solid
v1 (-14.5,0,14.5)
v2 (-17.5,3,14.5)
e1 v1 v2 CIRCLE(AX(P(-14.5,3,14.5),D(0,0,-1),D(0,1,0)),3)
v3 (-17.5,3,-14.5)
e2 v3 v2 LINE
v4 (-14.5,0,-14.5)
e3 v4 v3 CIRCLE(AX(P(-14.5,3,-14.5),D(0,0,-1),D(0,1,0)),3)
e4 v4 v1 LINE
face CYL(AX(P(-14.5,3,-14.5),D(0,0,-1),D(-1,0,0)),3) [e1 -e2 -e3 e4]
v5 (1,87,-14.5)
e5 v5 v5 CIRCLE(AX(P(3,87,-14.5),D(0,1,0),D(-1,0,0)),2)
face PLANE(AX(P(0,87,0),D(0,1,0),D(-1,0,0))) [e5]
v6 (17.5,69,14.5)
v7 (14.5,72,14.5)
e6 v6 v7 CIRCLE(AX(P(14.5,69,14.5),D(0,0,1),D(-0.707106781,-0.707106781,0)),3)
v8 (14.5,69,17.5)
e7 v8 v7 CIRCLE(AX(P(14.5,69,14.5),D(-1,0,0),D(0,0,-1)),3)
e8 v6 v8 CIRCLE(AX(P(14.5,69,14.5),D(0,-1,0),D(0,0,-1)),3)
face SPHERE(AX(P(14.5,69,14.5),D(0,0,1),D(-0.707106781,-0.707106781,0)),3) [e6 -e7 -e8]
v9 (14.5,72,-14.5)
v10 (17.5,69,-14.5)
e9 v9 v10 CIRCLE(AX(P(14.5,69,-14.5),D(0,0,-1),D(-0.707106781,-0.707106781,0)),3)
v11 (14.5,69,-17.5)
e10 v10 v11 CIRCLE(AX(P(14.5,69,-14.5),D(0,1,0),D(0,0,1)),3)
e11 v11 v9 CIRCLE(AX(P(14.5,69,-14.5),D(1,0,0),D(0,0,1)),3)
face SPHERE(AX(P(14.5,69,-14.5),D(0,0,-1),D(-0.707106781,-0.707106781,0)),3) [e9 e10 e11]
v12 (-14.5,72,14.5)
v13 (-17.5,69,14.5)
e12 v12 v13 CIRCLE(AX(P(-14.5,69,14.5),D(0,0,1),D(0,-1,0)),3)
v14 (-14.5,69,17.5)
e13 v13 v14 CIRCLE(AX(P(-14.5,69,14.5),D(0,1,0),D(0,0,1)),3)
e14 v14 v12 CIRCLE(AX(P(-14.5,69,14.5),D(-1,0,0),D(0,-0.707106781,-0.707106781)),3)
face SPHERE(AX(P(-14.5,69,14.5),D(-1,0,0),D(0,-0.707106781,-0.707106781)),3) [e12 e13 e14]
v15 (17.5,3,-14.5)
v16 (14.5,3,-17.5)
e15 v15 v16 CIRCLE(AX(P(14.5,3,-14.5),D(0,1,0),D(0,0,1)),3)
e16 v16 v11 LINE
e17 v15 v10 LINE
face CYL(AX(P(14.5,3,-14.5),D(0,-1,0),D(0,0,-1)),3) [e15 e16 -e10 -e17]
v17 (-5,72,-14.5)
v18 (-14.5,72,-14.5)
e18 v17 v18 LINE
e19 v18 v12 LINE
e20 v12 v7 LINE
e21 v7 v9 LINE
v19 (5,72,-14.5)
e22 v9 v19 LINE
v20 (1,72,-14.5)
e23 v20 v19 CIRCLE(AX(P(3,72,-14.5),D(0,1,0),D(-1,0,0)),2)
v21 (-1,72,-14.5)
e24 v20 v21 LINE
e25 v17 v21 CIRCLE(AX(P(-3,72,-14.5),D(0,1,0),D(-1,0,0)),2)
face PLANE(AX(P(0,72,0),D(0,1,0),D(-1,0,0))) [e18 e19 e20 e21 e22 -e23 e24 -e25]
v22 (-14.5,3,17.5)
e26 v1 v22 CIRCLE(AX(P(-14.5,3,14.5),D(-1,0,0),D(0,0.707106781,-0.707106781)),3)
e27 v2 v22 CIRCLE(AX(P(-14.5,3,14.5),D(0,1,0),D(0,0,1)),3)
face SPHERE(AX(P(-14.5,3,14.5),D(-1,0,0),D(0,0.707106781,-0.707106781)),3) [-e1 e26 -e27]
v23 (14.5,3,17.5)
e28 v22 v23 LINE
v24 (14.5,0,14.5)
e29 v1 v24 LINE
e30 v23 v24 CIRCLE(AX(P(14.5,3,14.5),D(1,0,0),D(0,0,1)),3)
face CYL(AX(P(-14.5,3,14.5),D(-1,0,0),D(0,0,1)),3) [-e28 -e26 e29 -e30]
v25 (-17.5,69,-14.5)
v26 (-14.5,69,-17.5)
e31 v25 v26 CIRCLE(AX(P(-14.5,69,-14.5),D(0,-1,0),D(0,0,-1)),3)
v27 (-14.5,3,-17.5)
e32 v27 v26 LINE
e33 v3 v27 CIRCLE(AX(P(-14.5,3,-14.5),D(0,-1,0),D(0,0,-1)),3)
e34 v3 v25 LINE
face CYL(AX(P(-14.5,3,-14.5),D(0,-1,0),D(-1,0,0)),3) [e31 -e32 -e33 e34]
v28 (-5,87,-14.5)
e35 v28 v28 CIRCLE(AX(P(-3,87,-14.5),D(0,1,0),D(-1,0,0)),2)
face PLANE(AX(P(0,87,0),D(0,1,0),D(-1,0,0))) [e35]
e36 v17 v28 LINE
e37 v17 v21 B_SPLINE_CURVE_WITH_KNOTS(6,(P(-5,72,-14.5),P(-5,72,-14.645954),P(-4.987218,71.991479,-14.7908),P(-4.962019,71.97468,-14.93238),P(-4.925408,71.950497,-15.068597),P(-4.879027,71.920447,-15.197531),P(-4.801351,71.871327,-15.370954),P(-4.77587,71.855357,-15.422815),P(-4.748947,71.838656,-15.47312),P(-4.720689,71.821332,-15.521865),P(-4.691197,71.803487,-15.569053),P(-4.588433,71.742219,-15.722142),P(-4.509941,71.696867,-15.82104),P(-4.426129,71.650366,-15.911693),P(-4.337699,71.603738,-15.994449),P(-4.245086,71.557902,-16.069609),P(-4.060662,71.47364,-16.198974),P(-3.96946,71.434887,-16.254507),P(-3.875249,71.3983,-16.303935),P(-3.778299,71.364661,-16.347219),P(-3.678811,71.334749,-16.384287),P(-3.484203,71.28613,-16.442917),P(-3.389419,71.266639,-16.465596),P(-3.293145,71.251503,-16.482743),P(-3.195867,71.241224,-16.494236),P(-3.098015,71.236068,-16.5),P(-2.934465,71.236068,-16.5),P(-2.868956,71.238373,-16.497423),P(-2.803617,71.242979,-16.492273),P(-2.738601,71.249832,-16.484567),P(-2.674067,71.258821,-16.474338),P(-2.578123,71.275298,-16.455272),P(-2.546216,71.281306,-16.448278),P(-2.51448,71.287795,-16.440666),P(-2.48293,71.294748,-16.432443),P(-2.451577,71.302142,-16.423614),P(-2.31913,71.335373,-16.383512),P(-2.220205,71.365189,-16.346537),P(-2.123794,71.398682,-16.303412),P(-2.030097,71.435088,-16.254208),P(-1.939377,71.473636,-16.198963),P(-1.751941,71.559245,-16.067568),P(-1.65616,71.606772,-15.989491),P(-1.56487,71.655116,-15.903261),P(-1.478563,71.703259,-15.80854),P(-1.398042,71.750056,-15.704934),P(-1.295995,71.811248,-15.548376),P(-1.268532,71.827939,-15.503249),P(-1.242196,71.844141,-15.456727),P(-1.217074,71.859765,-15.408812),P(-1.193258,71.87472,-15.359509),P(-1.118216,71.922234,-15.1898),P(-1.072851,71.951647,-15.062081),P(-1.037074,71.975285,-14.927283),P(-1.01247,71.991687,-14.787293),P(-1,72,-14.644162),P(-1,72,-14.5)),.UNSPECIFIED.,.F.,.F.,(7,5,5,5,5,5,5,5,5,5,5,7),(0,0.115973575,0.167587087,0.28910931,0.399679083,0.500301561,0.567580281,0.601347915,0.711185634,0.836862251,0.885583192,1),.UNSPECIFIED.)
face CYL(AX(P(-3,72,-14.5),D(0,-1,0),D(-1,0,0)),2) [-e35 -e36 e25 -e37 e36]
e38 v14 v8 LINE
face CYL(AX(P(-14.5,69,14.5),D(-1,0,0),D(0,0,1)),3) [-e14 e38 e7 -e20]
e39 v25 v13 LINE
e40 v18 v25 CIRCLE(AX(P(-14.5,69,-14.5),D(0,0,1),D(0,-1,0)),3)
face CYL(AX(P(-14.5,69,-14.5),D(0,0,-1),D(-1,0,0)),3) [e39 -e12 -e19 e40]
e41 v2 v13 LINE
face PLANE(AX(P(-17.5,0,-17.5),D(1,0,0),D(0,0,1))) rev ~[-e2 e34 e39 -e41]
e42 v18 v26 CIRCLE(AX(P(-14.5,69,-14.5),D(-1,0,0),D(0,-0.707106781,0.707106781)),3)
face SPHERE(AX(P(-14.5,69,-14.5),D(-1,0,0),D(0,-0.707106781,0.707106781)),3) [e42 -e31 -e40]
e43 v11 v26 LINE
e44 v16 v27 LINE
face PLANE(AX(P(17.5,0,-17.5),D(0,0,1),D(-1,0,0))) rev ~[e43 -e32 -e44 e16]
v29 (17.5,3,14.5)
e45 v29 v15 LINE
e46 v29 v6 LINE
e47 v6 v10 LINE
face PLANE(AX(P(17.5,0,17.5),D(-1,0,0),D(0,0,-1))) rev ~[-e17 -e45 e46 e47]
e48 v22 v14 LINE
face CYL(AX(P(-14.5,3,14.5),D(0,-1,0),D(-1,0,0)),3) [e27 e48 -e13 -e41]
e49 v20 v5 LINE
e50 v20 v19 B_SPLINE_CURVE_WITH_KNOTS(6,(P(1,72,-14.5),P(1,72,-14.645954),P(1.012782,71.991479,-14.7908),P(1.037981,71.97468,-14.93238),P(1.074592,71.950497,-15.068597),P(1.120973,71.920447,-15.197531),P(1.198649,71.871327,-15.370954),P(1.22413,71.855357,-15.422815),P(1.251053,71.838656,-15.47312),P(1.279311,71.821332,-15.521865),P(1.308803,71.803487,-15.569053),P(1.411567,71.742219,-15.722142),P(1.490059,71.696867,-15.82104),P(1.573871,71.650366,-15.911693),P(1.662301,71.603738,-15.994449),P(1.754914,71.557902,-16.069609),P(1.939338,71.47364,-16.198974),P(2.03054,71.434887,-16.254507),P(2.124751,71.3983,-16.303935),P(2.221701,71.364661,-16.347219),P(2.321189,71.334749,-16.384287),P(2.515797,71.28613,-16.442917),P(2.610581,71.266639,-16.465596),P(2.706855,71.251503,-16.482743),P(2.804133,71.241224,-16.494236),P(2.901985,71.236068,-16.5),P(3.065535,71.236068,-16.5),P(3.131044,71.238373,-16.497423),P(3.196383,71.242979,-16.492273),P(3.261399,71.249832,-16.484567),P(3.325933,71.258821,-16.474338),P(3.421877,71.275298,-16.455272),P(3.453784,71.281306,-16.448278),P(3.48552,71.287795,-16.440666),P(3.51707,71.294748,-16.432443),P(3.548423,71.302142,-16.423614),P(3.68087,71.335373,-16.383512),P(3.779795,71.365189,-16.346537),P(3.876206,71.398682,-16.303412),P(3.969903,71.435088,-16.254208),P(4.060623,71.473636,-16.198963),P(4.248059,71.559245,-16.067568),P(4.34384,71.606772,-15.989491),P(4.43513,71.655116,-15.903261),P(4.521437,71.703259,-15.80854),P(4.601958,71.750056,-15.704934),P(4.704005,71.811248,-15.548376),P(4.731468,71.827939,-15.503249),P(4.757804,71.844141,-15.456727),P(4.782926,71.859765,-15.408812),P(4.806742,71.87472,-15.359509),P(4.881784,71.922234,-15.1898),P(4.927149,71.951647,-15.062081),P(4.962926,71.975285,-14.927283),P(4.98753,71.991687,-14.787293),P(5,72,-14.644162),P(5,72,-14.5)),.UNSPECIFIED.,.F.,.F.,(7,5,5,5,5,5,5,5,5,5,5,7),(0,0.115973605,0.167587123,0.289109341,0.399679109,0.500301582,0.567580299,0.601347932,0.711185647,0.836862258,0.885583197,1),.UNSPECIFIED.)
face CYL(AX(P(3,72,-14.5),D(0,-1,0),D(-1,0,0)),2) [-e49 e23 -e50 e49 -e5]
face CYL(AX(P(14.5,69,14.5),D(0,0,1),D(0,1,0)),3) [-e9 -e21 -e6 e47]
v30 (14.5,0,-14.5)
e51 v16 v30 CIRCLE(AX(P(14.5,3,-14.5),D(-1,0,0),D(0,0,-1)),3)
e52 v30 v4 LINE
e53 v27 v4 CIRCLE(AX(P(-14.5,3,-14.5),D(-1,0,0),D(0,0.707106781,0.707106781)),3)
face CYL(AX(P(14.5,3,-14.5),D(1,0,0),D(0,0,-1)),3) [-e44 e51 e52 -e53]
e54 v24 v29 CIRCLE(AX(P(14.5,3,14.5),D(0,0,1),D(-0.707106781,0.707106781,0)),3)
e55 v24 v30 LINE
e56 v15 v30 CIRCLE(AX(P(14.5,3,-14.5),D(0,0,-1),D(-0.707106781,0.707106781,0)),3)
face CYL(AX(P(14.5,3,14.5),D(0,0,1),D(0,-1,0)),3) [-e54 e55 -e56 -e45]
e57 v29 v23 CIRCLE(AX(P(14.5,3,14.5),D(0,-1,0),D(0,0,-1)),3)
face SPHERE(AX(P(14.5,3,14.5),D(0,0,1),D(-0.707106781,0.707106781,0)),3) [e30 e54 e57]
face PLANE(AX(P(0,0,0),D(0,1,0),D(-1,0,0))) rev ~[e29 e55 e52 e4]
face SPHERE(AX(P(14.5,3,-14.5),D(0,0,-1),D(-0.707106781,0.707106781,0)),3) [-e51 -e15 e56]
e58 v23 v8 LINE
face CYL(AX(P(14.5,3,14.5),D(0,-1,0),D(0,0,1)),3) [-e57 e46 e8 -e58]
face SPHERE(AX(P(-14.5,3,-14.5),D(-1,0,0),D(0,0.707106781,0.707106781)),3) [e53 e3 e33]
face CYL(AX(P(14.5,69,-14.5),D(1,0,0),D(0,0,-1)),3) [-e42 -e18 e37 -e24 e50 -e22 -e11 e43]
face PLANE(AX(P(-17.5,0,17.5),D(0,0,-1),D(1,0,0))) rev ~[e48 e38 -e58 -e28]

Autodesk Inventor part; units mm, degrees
ref_plane "YZ Plane" through (0, 0, 0) normal (1, 0, 0) x (0, 1, 0)
ref_plane "XZ Plane" through (0, 0, 0) normal (0, 1, 0) x (-1, 0, 0)
ref_plane "XY Plane" through (0, 0, 0) normal (0, 0, 1) x (1, 0, 0)
sketch "Sketch1" plane through (0, 0, 0) normal (0, 1, 0) x (-1, 0, 0)
  line L0 (17.5, 17.5) -> (-17.5, 17.5)
  line L1 (-17.5, 17.5) -> (-17.5, -17.5)
  line L2 (-17.5, -17.5) -> (17.5, -17.5)
  line L3 (17.5, -17.5) -> (17.5, 17.5)
  line L4 (17.5, 17.5) -> (-17.5, -17.5) construction
  line L5 (-17.5, 17.5) -> (17.5, -17.5) construction
  line L6 (0, -17.5) -> (0, -14.5) construction
  line L7 (0, -14.5) -> (3, -14.5) construction
  circle A0 centre (3, -14.5) radius 2
  circle A1 centre (-3, -14.5) radius 2
  point P0 (0, 0)
  dimension "d0" = 35
  dimension "d1" = 35
  dimension "d5" = 3
  dimension "d6" = 3
  dimension "d7" = 4
extrude "Extrusion1" add sketch "Sketch1" along normal blind 72 contours L3 L2 L1 L0 | A0 | A1
extrude "Extrusion2" add sketch "Sketch1" along normal blind 15 from surface at 72 contours A0 | A1
fillet "Fillet1" radius 3 12 edges at (17.5, 36, 17.5) (17.5, 36, -17.5) (-17.5, 36, 17.5) (-17.5, 36, -17.5) (17.5, 72, 0) (0, 72, 17.5) (0, 72, -17.5) (-17.5, 72, 0) (17.5, 0, 0) (0, 0, 17.5) (-17.5, 0, 0) (0, 0, -17.5)
properties part number "Tattu 14,8V 1550 mAh 100C LiPo-Akku XT60"
